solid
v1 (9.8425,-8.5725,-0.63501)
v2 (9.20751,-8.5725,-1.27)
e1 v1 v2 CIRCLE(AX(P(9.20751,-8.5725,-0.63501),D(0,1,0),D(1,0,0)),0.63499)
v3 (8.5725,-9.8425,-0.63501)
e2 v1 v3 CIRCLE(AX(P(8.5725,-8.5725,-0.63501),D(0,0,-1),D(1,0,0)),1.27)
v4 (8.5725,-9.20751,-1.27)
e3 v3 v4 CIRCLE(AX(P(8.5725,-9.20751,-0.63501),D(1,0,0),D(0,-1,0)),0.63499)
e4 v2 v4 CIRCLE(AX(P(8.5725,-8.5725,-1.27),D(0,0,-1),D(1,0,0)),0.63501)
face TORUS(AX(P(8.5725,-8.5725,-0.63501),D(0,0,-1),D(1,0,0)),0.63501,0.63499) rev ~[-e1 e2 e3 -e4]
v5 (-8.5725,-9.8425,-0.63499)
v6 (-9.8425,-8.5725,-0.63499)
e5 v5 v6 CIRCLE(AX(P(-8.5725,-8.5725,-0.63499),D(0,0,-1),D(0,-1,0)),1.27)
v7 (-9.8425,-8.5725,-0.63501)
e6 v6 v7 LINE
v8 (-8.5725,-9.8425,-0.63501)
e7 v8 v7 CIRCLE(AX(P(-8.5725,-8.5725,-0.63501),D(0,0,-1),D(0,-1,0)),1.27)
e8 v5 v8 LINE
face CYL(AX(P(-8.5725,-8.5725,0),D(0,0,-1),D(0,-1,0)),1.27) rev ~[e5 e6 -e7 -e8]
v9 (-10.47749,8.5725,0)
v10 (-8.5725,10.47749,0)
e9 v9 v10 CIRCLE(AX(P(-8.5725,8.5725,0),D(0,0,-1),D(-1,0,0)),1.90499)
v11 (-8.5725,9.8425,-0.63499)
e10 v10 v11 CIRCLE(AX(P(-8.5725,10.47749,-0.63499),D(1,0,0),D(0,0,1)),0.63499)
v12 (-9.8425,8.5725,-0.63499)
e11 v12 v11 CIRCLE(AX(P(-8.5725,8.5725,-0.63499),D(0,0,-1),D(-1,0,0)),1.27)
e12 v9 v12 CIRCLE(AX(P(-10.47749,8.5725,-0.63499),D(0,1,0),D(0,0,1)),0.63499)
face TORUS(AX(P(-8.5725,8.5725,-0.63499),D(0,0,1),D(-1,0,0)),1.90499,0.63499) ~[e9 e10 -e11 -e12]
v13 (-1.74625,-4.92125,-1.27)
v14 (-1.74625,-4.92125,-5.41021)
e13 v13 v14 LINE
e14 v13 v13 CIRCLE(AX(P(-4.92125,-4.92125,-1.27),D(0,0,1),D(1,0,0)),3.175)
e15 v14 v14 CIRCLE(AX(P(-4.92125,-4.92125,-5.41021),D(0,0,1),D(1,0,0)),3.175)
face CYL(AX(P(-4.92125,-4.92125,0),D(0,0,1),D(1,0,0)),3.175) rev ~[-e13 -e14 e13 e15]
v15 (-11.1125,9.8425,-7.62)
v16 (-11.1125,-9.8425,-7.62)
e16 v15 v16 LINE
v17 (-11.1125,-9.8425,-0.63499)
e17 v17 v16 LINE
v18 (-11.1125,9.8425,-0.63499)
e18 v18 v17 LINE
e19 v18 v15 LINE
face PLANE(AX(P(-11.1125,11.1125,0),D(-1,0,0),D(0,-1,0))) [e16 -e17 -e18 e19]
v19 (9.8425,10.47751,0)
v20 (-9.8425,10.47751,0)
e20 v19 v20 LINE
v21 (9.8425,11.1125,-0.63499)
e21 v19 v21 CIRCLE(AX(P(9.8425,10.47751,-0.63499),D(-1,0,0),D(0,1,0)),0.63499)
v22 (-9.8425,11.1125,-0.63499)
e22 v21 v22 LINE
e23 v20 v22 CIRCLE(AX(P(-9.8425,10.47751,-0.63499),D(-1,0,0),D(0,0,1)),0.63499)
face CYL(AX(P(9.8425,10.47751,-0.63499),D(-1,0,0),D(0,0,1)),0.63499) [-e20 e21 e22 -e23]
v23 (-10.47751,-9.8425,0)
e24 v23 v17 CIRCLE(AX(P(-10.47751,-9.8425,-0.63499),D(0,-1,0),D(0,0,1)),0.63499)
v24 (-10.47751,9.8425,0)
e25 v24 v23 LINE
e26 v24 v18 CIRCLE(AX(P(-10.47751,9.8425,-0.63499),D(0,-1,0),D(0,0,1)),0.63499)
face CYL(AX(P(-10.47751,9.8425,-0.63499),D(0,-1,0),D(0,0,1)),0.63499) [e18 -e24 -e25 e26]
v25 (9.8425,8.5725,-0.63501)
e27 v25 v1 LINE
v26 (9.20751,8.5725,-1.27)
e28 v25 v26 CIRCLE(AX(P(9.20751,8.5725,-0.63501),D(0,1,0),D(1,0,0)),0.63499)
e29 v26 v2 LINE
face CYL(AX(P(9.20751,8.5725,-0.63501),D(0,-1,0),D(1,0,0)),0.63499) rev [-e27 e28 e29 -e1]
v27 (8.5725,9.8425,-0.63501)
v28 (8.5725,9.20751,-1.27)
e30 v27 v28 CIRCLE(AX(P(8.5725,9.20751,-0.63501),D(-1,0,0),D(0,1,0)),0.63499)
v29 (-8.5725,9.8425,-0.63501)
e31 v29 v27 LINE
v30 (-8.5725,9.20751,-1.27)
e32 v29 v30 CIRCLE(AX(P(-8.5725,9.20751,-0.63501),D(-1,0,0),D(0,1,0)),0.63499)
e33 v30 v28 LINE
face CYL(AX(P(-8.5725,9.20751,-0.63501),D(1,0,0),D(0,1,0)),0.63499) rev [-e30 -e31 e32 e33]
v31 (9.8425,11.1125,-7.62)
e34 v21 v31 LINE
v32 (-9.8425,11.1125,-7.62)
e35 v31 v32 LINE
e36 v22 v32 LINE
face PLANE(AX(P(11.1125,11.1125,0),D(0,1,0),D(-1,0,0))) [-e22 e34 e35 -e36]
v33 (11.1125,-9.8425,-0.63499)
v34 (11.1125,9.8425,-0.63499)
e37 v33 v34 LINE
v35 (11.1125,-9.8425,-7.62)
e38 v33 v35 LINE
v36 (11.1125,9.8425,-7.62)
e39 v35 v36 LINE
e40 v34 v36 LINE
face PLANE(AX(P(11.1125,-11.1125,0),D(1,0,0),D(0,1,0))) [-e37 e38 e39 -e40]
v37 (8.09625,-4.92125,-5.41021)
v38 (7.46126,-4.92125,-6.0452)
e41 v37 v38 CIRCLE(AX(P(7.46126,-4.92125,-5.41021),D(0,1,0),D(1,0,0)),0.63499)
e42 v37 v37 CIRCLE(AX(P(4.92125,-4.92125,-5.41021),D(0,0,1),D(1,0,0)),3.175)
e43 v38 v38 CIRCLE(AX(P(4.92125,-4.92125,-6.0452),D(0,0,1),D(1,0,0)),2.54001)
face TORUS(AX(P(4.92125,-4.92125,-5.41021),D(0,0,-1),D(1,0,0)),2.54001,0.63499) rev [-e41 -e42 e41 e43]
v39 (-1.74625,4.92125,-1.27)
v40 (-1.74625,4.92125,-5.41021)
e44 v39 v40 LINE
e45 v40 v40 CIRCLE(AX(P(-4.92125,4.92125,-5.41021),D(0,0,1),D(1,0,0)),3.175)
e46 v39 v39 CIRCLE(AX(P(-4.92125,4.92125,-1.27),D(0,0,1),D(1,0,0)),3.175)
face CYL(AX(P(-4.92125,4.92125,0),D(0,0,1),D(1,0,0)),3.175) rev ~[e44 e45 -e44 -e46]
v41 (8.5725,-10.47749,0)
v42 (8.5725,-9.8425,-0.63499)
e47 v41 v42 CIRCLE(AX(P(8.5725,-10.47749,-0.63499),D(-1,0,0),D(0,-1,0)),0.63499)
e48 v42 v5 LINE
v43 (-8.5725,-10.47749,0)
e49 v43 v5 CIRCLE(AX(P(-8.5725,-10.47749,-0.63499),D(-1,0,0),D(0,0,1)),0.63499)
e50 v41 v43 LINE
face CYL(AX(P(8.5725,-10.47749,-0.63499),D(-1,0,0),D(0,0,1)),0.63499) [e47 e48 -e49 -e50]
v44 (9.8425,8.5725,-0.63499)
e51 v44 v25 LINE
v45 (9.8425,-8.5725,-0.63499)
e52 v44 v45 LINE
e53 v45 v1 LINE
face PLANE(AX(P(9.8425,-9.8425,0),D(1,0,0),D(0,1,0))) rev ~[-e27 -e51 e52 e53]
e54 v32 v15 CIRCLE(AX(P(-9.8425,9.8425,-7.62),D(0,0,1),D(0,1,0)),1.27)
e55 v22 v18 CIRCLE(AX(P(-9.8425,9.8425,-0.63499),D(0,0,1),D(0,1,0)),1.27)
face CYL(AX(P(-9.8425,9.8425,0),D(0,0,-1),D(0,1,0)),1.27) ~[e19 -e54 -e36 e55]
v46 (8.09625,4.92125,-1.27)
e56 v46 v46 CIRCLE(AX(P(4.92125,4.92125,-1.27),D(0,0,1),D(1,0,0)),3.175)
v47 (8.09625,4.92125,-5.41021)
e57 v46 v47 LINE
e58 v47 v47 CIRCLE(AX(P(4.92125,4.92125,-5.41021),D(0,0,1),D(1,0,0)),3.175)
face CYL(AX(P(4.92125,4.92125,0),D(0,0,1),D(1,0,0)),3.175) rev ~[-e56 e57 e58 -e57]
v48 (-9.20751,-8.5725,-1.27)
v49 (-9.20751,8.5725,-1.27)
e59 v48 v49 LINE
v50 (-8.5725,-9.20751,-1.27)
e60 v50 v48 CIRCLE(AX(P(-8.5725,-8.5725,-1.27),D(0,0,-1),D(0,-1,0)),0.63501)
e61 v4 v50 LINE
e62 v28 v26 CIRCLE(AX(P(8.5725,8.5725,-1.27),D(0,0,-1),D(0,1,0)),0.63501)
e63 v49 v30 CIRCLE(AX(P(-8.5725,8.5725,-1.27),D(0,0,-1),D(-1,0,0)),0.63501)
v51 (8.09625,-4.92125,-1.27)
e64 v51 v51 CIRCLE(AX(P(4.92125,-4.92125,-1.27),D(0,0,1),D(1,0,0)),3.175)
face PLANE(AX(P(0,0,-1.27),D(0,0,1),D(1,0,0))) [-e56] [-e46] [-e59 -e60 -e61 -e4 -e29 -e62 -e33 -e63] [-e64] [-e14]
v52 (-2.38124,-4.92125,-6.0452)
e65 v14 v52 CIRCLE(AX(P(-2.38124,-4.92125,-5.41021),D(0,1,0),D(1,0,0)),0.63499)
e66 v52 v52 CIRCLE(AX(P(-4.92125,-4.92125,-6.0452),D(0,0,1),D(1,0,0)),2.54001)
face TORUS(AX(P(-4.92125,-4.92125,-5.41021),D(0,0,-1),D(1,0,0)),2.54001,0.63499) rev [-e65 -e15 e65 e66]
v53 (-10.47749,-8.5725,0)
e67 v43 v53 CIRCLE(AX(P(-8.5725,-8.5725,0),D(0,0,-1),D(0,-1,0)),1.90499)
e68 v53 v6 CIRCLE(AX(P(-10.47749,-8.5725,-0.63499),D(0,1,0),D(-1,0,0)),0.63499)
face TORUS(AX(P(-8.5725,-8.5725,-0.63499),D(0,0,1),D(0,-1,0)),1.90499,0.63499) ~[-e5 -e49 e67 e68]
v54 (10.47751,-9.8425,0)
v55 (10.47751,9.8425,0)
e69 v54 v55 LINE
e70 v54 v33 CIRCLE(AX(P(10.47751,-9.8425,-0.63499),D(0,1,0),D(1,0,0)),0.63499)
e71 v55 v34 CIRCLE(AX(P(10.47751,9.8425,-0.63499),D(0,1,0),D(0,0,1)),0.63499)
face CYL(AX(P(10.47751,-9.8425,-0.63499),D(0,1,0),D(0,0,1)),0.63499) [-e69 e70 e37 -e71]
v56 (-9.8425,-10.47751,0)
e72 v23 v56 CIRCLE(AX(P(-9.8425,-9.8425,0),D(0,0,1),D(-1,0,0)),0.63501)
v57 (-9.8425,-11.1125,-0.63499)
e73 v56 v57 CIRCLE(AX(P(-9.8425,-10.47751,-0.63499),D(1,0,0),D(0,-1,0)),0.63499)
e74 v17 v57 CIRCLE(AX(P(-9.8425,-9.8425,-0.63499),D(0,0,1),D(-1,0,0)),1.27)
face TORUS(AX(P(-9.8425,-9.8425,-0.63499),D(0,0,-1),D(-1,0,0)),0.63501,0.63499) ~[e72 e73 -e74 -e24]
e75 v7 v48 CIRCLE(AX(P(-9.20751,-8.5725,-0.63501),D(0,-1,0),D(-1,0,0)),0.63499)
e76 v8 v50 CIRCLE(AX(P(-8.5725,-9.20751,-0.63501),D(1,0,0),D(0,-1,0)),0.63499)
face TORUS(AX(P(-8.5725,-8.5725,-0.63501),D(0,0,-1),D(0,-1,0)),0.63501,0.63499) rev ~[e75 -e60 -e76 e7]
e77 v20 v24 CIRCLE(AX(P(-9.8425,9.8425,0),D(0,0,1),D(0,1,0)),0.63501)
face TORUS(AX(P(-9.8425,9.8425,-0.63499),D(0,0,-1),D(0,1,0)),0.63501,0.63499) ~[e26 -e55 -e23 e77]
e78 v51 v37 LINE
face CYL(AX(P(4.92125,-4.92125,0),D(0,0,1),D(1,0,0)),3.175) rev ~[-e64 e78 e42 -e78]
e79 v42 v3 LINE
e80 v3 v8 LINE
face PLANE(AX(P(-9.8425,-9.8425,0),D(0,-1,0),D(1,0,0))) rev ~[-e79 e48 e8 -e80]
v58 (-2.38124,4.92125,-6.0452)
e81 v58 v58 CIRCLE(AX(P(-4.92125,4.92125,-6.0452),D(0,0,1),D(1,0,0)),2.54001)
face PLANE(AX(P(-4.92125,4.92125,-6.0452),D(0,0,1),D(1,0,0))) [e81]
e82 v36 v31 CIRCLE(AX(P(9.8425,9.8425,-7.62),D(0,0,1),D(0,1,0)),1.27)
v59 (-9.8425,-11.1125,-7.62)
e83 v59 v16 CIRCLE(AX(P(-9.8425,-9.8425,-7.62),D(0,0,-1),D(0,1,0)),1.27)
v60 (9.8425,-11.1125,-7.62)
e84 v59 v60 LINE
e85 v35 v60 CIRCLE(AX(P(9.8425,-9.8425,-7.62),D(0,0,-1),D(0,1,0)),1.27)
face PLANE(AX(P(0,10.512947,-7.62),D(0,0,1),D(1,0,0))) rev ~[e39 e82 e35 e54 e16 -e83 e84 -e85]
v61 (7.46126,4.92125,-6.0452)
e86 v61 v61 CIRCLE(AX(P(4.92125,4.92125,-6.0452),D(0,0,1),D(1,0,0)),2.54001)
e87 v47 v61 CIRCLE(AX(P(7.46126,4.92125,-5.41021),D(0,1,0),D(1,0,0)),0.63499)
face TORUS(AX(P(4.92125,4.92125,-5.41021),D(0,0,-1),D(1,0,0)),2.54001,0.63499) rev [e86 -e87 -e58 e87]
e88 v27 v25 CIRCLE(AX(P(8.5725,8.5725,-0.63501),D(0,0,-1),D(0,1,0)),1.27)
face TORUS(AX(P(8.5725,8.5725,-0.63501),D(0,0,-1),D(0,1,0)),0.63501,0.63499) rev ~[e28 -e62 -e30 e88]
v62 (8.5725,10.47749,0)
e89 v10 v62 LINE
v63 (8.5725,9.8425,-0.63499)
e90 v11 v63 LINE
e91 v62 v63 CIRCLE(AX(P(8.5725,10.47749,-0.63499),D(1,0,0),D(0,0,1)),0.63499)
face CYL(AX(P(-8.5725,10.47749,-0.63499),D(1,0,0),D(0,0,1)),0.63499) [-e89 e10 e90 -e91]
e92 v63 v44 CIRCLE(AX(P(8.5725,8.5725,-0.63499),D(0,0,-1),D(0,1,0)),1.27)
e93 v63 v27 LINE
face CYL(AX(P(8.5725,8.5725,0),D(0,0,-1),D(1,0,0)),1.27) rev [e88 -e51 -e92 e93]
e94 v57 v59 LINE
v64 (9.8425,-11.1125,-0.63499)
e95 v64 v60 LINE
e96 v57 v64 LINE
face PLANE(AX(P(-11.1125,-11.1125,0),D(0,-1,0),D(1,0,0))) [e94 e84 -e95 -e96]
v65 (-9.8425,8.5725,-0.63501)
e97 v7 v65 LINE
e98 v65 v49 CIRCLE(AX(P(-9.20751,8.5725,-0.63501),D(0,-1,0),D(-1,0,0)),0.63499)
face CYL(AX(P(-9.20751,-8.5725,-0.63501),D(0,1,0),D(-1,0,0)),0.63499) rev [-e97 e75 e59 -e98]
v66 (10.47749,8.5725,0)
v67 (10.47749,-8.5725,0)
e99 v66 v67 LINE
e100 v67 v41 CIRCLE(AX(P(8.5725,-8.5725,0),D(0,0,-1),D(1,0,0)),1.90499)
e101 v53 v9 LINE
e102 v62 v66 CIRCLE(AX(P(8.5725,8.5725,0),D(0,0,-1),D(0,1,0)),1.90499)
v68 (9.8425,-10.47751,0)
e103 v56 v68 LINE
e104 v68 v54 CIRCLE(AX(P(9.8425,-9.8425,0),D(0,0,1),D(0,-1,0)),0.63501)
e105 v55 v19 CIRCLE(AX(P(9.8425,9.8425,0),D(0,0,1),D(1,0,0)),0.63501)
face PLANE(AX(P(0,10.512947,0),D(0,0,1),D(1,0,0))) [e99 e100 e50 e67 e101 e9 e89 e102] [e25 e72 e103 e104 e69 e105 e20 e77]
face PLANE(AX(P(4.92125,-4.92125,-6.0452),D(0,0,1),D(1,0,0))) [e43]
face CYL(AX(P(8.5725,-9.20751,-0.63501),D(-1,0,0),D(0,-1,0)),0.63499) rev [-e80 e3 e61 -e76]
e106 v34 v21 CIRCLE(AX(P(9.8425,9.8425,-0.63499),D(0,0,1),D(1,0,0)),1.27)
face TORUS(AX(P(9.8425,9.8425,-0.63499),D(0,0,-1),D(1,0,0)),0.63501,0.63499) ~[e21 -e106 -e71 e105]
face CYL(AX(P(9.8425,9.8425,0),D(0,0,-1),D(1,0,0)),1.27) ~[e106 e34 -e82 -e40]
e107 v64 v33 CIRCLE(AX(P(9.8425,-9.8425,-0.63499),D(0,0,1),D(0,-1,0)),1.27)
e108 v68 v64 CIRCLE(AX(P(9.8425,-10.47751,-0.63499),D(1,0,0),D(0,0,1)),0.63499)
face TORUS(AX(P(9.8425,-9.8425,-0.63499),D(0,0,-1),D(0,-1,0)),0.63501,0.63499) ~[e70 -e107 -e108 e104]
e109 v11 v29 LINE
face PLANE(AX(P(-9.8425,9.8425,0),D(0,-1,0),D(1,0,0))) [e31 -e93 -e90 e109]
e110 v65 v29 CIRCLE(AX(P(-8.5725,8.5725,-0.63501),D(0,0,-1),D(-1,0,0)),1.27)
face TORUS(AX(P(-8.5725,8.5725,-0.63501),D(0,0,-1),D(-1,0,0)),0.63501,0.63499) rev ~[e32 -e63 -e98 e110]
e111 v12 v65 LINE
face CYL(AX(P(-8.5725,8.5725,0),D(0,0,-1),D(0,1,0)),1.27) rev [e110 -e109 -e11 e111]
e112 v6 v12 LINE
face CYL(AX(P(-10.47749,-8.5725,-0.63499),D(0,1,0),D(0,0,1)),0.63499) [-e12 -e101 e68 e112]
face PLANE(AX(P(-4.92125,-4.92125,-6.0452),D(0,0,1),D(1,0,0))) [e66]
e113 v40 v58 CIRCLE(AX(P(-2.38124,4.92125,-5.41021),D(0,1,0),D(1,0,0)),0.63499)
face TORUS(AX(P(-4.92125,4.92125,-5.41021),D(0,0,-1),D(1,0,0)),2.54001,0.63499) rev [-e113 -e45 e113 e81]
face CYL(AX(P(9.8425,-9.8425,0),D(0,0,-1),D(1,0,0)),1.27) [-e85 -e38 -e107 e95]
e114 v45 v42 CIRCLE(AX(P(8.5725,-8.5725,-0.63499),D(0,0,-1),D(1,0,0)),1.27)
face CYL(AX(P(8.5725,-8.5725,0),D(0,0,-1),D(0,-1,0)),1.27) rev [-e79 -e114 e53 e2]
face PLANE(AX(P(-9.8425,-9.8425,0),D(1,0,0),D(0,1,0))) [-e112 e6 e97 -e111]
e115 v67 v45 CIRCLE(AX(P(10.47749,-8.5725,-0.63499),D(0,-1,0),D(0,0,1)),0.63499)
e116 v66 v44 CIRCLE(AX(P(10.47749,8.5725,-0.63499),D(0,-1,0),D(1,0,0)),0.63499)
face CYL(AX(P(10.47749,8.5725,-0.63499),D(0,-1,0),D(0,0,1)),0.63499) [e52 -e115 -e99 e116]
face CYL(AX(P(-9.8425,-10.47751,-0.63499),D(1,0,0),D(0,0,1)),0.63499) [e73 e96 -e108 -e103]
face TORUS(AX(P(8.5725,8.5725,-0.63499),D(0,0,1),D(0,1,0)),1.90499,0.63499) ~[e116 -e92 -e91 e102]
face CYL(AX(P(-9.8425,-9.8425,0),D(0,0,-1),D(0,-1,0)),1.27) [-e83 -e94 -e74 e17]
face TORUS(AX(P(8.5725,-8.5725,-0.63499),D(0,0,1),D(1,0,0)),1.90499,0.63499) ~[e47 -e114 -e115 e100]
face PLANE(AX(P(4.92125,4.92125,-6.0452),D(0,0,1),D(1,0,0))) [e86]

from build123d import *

# Parameters (mm, degrees)
F0_W     = 19.685
F0_H     = 19.685
F0_R     = 3.175
F1_DEPTH = 7.62
F2_DEPTH = 1.27
F3_DEPTH = 6.0452
F4_R     = 1.27
F5_R     = 0.63499


# Not quite as in the source:
# - a fillet or chamfer is up to 0.001 mm smaller than in the source, because OpenCascade refuses the exact size


with BuildPart() as f1:
    # F0 (on Top) → F1 (new body)
    with BuildSketch(Plane.XY):
        Polygon((-11.1125, 11.1125), (-9.8425, 9.8425), (9.8425, 9.8425), (11.1125, 11.1125), align=None)
        Polygon((11.1125, 11.1125), (9.8425, 9.8425), (9.8425, -9.8425), (11.1125, -11.1125), align=None)
        Polygon((-9.8425, -9.8425), (-9.8425, 9.8425), (-11.1125, 11.1125), (-11.1125, -11.1125), align=None)
        Polygon((9.8425, -9.8425), (-9.8425, -9.8425), (-11.1125, -11.1125), (11.1125, -11.1125), align=None)
        Rectangle(F0_W, F0_H)
        with Locations((-4.92125, -4.92125)):
            Circle(F0_R, mode=Mode.SUBTRACT)
        with Locations((4.92125, -4.92125)):
            Circle(F0_R, mode=Mode.SUBTRACT)
        with Locations((-4.92125, 4.92125)):
            Circle(F0_R, mode=Mode.SUBTRACT)
        with Locations((4.92125, 4.92125)):
            Circle(F0_R, mode=Mode.SUBTRACT)
        with Locations((-4.92125, 4.92125)):
            Circle(F0_R)
        with Locations((4.92125, 4.92125)):
            Circle(F0_R)
        with Locations((-4.92125, -4.92125)):
            Circle(F0_R)
        with Locations((4.92125, -4.92125)):
            Circle(F0_R)
    extrude(amount=-F1_DEPTH)

    # F0 (on Top) → F2 (cut)
    with BuildSketch(Plane.XY):
        Rectangle(F0_W, F0_H)
        with Locations((-4.92125, -4.92125)):
            Circle(F0_R, mode=Mode.SUBTRACT)
        with Locations((4.92125, -4.92125)):
            Circle(F0_R, mode=Mode.SUBTRACT)
        with Locations((-4.92125, 4.92125)):
            Circle(F0_R, mode=Mode.SUBTRACT)
        with Locations((4.92125, 4.92125)):
            Circle(F0_R, mode=Mode.SUBTRACT)
        with Locations((-4.92125, 4.92125)):
            Circle(F0_R)
        with Locations((4.92125, 4.92125)):
            Circle(F0_R)
        with Locations((4.92125, -4.92125)):
            Circle(F0_R)
        with Locations((-4.92125, -4.92125)):
            Circle(F0_R)
    extrude(amount=-F2_DEPTH, mode=Mode.SUBTRACT)

    # F0 (on Top) → F3 (cut)
    with BuildSketch(Plane.XY):
        with Locations((-4.92125, 4.92125)):
            Circle(F0_R)
        with Locations((-4.92125, -4.92125)):
            Circle(F0_R)
        with Locations((4.92125, -4.92125)):
            Circle(F0_R)
        with Locations((4.92125, 4.92125)):
            Circle(F0_R)
    extrude(amount=-F3_DEPTH, mode=Mode.SUBTRACT)

    # F4
    f4_edges = [f1.edges().sort_by_distance(p)[0] for p in [
        (11.1125, -11.1125, -3.81),
        (11.1125, 11.1125, -3.81),
        (-11.1125, -11.1125, -3.81),
        (-11.1125, 11.1125, -3.81),
        (-9.8425, -9.8425, -0.635),
        (-9.8425, 9.8425, -0.635),
        (9.8425, 9.8425, -0.635),
        (9.8425, -9.8425, -0.635),
    ]]
    fillet(f4_edges, radius=F4_R)

    # F5 (radius 0.635 in the source; OpenCascade refuses exactly that, so slightly less here)
    f5_edges = [f1.edges().sort_by_distance(p)[0] for p in [
        (-8.09625, 4.92125, -6.0452),
        (1.74625, 4.92125, -6.0452),
        (1.74625, -4.92125, -6.0452),
        (-8.09625, -4.92125, -6.0452),
        (-9.8425, 0, -1.27),
        (0, 9.8425, 0),
        (-11.1125, 0, 0),
    ]]
    fillet(f5_edges, radius=F5_R)


solid = f1.part
